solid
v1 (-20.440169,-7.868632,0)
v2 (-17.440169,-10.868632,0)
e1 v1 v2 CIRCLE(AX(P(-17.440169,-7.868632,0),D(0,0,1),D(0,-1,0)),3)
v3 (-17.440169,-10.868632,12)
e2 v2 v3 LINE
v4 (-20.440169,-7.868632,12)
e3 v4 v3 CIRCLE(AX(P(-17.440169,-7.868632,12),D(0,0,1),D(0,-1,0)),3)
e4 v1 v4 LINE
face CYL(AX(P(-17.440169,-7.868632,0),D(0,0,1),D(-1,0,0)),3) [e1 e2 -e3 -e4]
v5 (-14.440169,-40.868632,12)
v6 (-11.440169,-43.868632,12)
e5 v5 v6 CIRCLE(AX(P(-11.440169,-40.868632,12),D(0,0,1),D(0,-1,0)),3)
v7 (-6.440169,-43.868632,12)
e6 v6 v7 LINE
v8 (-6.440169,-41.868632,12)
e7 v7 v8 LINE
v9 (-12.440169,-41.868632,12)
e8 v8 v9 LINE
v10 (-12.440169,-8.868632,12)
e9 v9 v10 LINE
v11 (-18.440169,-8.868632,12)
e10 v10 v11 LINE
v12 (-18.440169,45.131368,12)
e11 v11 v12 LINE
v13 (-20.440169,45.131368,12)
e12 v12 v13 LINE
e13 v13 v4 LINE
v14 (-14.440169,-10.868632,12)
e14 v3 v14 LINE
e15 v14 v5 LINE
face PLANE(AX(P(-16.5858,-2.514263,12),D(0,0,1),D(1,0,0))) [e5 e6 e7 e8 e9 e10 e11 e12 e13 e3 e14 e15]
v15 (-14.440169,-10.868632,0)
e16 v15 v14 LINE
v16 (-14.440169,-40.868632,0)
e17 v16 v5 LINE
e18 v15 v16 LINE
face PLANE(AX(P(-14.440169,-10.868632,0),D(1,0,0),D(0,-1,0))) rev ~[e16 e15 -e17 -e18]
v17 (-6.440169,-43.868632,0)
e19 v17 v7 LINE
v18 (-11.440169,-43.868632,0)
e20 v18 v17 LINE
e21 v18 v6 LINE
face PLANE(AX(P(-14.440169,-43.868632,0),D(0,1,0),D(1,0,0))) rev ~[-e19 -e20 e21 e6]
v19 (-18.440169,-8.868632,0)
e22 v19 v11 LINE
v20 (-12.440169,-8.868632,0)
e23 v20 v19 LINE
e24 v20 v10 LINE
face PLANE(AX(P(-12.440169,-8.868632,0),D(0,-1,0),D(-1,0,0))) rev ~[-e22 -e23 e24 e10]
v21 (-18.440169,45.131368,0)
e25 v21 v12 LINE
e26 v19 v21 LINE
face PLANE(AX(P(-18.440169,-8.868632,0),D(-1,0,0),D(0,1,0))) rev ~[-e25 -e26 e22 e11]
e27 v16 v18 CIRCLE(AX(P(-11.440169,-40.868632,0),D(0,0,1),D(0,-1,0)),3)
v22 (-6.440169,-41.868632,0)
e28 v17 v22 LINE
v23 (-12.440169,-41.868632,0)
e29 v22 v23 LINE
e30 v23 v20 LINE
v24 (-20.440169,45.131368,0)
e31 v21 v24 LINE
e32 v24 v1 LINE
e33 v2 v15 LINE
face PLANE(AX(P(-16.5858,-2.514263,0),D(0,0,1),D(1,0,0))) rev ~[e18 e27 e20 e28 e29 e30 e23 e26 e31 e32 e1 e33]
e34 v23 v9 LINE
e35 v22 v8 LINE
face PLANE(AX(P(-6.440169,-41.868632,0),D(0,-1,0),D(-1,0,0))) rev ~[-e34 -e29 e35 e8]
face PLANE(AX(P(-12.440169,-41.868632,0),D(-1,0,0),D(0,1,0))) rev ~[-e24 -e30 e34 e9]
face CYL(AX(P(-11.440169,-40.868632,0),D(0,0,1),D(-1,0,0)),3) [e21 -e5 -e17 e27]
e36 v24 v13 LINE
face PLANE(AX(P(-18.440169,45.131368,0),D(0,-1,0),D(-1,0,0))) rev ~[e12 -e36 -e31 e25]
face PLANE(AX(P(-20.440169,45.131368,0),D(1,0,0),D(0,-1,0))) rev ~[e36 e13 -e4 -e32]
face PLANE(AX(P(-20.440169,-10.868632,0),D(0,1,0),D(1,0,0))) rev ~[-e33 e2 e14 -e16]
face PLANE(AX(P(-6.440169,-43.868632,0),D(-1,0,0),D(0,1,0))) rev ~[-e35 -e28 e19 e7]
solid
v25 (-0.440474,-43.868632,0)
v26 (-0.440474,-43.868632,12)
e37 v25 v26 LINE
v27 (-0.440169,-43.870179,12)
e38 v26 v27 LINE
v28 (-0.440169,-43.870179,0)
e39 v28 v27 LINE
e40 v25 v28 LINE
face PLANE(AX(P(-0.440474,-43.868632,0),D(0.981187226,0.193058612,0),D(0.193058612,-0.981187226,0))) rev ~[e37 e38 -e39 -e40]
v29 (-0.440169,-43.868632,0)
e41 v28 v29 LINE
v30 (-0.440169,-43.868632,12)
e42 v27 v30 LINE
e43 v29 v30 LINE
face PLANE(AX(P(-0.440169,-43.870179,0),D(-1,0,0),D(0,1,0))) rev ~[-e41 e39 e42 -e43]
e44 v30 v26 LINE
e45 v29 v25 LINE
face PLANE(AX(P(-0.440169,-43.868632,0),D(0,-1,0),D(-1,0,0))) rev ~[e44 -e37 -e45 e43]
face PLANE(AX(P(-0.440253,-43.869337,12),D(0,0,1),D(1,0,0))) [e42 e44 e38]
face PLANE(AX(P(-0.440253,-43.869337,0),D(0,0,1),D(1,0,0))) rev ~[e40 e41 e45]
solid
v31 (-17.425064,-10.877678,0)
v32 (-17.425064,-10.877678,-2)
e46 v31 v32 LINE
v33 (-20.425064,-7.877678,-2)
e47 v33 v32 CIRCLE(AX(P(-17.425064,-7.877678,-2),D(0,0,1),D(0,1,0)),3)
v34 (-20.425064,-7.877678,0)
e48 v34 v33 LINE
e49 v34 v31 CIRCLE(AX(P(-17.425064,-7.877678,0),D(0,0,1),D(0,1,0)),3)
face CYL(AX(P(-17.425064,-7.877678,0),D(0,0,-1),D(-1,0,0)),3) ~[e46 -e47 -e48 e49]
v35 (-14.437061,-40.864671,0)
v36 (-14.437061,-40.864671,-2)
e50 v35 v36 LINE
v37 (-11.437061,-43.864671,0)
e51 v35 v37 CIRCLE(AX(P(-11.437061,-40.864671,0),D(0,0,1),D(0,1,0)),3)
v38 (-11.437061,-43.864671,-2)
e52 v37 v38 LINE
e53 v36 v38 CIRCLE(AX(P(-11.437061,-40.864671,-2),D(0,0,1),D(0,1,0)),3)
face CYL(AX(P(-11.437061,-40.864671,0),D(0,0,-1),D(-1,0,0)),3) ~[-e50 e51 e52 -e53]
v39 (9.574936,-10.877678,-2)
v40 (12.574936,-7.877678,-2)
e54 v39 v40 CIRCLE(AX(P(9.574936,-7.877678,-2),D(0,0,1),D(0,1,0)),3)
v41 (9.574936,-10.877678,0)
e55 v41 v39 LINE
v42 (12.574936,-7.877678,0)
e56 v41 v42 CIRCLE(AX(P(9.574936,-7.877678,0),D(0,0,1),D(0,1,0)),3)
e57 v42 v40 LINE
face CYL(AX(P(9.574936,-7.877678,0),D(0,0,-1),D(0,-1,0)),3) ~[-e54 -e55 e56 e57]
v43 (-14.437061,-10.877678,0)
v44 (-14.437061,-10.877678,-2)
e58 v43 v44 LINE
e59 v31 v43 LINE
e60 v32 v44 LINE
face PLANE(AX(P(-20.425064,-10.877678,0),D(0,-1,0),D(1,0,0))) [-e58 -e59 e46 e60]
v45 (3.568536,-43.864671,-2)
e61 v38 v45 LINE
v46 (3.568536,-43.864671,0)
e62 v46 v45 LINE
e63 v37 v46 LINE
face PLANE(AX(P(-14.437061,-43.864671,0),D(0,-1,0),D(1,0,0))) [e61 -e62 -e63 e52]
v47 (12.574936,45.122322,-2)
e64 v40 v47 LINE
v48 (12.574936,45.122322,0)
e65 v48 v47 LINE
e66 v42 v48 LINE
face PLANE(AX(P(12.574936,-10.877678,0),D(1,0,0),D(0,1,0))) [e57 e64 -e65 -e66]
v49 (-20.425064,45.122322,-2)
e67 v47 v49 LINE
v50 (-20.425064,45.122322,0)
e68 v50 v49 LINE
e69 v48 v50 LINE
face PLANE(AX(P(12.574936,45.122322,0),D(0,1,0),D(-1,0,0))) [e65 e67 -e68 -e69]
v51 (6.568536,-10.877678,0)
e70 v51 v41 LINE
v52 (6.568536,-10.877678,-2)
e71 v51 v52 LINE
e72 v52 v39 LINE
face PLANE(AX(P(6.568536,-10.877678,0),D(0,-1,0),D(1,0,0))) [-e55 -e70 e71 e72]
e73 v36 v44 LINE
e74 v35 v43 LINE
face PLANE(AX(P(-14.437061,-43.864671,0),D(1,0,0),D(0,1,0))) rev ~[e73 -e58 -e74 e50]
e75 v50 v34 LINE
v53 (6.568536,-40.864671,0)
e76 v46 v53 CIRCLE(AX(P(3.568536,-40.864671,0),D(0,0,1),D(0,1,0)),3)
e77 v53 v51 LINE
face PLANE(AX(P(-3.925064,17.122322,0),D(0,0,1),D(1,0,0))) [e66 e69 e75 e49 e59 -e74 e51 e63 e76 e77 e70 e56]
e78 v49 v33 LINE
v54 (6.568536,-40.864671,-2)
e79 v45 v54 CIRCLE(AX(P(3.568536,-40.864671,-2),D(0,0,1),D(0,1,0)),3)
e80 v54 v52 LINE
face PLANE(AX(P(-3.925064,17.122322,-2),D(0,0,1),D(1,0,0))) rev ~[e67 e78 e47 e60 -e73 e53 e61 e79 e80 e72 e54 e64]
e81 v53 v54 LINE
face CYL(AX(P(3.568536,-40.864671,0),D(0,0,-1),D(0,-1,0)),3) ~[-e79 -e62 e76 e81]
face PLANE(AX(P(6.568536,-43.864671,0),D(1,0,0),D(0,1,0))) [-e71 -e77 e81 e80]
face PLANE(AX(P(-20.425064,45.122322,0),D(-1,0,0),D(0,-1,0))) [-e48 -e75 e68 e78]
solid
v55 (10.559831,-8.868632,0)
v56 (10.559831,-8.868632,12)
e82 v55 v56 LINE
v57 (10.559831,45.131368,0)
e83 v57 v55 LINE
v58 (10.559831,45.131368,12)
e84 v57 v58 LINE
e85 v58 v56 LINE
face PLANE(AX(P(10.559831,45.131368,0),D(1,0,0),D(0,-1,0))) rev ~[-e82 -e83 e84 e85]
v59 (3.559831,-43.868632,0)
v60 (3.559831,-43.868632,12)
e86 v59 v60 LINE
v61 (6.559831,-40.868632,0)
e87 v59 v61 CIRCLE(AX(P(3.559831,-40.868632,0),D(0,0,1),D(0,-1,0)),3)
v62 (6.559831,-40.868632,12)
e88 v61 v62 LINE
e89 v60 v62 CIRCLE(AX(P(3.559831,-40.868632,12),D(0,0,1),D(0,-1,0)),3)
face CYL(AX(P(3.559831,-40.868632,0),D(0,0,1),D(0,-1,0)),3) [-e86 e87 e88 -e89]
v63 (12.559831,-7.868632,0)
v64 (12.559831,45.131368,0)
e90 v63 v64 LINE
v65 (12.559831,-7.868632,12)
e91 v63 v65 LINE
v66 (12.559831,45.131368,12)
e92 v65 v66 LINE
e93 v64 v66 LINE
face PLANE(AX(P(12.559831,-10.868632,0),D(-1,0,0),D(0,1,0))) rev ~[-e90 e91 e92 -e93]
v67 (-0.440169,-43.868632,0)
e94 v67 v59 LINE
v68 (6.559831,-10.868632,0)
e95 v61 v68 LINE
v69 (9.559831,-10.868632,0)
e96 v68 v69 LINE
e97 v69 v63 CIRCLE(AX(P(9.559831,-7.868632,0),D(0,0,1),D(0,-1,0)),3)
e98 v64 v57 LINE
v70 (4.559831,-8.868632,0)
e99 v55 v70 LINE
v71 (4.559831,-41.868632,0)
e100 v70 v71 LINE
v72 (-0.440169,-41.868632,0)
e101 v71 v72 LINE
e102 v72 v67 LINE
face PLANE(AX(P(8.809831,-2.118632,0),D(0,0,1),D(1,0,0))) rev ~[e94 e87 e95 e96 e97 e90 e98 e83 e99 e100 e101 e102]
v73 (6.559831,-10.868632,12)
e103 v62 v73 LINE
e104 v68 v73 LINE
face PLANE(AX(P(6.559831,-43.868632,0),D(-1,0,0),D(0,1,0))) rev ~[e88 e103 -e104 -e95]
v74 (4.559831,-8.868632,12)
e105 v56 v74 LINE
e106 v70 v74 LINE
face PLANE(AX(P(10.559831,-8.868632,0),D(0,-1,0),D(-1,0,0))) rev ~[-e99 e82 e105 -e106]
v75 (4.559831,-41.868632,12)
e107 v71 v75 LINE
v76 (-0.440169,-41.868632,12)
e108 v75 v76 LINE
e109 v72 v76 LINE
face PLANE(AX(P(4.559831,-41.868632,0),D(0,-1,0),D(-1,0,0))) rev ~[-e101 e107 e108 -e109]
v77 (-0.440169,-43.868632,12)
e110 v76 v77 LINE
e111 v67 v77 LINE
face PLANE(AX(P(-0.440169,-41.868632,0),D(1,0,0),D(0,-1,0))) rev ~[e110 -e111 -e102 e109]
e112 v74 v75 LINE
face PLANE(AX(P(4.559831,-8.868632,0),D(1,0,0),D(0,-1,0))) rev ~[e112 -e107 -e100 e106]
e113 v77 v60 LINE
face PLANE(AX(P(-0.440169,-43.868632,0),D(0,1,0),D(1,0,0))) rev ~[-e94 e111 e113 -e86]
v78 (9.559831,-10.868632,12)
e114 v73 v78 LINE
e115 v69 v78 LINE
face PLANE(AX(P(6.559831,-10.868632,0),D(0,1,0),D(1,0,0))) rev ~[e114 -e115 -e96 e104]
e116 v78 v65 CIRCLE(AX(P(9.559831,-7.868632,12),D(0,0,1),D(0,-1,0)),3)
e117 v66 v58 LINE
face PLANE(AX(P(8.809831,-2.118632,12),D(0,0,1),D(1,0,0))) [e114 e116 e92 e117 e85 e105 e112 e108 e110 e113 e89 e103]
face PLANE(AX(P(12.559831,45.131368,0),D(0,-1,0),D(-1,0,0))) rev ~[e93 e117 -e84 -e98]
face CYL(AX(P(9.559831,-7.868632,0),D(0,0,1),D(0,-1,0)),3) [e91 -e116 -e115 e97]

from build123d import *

# Parameters (mm, degrees)
F1_DEPTH = 12
F2_W     = 21.0055973778
F2_H     = 32.9869928685
F3_DEPTH = 2
F4_R     = 3
F4_2_R   = 3
F4_3_R   = 3


with BuildPart() as f1:
    # F0 (on Top) → F1 (new body)
    with BuildSketch(Plane.XY):
        Polygon((-18.4401693158, 45.1313681013), (-20.4401693158, 45.1313681013), (-20.4401693158, -8.8686318987), (-20.4401693158, -10.8686318987), (-14.4401693158, -10.8686318987), (-14.4401693158, -43.8686318987), (-6.4401693158, -43.8686318987), (-6.4401693158, -41.8686318987), (-12.4401693158, -41.8686318987), (-12.4401693158, -8.8686318987), (-18.4401693158, -8.8686318987), align=None)
    extrude(amount=F1_DEPTH)

    # F4
    f4_edges = [f1.edges().sort_by_distance(p)[0] for p in [
        (-20.440169, -10.868632, 6),
        (-14.440169, -43.868632, 6),
    ]]
    fillet(f4_edges, radius=F4_R)


with BuildPart() as f1b:
    # F0 (on Top) → F1, piece 2 (new body)
    with BuildSketch(Plane.XY):
        Polygon((12.5598306842, 45.1313681013), (10.5598306842, 45.1313681013), (10.5598306842, -8.8686318987), (4.5598306842, -8.8686318987), (4.5598306842, -41.8686318987), (-0.4401693158, -41.8686318987), (-0.4401693158, -43.8686318987), (6.5598306842, -43.8686318987), (6.5598306842, -10.8686318987), (12.5598306842, -10.8686318987), (12.5598306842, -8.8686318987), align=None)
    extrude(amount=F1_DEPTH)

    # F4#2
    f4_2_edges = [f1b.edges().sort_by_distance(p)[0] for p in [
        (6.559831, -43.868632, 6),
        (12.559831, -10.868632, 6),
    ]]
    fillet(f4_2_edges, radius=F4_2_R)


with BuildPart() as f1c:
    # F0 (on Top) → F1, piece 3 (new body)
    with BuildSketch(Plane.XY):
        Polygon((-0.4401693158, -43.8701787744), (-0.4401693158, -43.8686318987), (-0.4404736794, -43.8686318987), align=None)
    extrude(amount=F1_DEPTH)


with BuildPart() as f3:
    # F2 (on Top) → F3 (new body)
    with BuildSketch(Plane.XY):
        Polygon((12.5749358821, 45.1223217276), (-20.4250641179, 45.1223217276), (-20.4250641179, -10.8776782724), (-14.4370612154, -10.8776782724), (6.5685361624, -10.8776782724), (12.5749358821, -10.8776782724), align=None)
        with Locations((-3.9342625265, -27.3711747067)):
            Rectangle(F2_W, F2_H)
    extrude(amount=-F3_DEPTH)

    # F4#3
    f4_3_edges = [f3.edges().sort_by_distance(p)[0] for p in [
        (-14.437061, -43.864671, -1),
        (6.568536, -43.864671, -1),
        (12.574936, -10.877678, -1),
        (-20.425064, -10.877678, -1),
    ]]
    fillet(f4_3_edges, radius=F4_3_R)


solid = Compound([f1.part, f1b.part, f1c.part, f3.part])
